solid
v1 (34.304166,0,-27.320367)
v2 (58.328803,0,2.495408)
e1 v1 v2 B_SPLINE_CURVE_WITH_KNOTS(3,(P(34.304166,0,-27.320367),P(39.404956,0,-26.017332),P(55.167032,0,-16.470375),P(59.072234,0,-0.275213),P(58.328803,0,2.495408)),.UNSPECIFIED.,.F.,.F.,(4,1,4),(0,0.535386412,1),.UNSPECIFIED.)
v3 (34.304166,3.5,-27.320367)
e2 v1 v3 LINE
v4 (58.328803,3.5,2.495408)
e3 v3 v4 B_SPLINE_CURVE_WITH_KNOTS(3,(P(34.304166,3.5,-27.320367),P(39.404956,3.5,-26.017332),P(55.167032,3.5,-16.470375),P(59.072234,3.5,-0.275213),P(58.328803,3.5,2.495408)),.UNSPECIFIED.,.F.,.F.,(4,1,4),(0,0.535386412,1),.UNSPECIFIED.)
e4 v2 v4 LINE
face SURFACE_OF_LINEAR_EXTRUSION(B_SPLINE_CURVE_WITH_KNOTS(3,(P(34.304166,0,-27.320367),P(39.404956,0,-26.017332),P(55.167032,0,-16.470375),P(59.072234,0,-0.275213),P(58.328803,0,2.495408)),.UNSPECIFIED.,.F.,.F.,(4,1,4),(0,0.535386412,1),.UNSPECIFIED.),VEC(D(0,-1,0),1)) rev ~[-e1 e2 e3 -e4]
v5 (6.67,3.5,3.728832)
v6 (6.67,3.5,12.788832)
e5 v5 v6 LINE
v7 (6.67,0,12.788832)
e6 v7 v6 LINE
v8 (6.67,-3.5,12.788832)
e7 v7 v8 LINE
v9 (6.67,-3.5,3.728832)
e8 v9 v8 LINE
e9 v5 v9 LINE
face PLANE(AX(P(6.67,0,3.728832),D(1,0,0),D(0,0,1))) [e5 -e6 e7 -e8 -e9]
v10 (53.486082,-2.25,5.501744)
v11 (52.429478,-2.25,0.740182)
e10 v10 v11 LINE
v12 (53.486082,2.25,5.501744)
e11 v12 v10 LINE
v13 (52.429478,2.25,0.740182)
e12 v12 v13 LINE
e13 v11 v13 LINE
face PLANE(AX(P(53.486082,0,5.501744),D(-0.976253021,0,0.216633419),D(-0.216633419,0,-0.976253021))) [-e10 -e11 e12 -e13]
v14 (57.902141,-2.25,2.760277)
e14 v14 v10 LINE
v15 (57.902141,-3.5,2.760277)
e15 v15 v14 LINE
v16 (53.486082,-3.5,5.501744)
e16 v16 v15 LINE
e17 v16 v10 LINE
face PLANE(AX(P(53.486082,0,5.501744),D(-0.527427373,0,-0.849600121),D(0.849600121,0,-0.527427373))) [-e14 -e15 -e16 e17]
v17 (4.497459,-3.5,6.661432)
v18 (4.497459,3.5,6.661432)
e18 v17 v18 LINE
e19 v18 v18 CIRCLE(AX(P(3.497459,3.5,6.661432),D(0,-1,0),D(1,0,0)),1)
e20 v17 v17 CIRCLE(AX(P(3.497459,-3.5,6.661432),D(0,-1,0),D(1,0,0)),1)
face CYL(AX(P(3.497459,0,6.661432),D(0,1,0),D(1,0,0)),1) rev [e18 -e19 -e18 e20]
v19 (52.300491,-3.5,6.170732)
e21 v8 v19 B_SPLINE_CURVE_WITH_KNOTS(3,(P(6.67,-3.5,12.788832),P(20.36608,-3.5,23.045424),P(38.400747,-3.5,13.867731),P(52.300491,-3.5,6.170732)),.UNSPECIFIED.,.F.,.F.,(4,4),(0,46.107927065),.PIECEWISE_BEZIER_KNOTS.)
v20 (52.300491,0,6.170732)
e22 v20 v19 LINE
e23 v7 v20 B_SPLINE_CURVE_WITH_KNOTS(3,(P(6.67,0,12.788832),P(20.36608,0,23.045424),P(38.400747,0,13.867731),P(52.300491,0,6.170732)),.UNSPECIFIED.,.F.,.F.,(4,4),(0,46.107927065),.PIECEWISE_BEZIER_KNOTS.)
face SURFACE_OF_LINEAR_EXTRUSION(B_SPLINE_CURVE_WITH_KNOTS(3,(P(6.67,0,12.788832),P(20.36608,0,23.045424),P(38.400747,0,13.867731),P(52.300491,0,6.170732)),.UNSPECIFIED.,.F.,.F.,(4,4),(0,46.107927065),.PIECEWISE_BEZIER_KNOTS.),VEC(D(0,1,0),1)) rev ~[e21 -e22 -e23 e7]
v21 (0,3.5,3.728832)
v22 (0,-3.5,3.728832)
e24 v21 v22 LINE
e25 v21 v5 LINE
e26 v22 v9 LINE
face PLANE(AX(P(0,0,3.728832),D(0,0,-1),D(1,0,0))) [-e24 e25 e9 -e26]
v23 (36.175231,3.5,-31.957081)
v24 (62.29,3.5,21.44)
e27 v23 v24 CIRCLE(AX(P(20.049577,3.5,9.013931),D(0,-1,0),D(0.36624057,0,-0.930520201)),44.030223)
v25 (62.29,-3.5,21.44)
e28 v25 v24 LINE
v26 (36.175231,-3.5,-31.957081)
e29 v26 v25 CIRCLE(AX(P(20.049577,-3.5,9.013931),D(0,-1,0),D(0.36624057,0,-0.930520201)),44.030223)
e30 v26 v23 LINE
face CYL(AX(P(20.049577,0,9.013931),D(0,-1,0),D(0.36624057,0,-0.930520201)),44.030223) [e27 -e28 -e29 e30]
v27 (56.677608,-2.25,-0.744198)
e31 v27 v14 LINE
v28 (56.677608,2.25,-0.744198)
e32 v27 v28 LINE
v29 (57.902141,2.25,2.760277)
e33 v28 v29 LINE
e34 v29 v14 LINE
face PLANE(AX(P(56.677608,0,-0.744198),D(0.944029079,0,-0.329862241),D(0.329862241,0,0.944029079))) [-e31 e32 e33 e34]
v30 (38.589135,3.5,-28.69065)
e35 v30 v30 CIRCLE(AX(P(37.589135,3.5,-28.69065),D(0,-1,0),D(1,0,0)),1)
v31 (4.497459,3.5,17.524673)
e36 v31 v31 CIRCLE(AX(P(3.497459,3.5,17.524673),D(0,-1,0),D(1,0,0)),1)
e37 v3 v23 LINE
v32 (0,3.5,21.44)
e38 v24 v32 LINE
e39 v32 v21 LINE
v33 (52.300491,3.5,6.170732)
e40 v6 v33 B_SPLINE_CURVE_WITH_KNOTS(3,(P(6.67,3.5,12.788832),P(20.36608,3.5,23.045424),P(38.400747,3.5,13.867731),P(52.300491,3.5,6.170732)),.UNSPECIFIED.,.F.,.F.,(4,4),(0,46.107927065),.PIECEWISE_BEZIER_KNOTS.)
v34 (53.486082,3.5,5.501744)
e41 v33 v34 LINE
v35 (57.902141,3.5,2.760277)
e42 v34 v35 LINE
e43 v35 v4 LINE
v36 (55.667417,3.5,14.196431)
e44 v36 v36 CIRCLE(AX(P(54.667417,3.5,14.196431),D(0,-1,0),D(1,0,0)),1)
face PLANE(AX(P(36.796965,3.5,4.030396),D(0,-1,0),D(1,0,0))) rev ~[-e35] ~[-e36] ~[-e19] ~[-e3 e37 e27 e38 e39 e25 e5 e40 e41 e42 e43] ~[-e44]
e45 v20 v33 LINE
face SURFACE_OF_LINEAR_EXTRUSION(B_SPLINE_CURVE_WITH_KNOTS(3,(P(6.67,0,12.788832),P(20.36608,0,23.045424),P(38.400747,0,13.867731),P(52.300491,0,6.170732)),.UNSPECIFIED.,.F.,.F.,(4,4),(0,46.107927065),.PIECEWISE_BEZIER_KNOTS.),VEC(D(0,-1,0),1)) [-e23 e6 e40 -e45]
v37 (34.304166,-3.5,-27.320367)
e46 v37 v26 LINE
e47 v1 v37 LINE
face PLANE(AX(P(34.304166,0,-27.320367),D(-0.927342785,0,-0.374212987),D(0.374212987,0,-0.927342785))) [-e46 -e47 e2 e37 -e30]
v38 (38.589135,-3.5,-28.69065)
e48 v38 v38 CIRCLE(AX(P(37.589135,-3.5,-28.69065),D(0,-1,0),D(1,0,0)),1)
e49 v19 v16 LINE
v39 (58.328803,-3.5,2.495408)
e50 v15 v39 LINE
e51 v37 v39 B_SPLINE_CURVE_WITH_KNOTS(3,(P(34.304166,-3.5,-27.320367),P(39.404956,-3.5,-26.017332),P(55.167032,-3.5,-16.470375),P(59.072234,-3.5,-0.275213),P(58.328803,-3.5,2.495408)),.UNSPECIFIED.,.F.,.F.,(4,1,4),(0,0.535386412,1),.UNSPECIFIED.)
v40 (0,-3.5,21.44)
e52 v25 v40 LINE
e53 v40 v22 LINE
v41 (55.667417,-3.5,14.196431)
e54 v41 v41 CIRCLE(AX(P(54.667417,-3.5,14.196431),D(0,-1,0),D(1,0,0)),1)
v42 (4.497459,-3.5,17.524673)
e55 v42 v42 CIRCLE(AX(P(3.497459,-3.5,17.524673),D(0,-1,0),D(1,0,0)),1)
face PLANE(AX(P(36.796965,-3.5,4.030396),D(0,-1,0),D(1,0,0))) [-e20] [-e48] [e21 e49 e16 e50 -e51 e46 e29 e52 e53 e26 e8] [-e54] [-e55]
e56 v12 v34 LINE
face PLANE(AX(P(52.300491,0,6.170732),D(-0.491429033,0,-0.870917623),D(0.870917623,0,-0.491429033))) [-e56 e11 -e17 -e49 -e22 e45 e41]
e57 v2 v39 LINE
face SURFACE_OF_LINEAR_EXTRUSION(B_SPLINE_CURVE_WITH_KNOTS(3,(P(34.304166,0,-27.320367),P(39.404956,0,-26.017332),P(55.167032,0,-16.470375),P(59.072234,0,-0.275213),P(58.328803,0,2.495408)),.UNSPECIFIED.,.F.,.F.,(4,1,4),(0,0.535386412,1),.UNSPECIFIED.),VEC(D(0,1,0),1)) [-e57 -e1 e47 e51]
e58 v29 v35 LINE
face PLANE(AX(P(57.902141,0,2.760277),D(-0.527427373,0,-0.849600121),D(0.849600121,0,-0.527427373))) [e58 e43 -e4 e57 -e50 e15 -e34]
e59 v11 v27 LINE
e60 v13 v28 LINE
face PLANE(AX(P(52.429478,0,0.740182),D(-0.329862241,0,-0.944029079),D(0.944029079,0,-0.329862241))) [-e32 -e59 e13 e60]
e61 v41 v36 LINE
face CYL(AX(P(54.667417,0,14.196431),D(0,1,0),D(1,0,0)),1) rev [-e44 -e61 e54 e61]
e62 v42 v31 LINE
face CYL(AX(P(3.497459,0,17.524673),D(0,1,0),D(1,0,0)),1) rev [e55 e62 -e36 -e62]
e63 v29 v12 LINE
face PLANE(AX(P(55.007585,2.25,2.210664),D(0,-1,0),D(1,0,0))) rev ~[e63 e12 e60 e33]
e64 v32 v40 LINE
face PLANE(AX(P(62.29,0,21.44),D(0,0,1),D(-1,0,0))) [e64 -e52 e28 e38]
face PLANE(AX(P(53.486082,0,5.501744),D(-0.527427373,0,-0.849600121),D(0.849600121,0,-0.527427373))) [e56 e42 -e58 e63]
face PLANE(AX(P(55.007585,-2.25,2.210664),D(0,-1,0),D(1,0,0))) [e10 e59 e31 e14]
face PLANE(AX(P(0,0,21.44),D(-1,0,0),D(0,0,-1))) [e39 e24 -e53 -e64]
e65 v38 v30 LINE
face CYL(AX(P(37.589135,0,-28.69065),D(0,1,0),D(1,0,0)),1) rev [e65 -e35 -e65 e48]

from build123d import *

# Parameters (mm, degrees)
F0_R     = 1
F1_DEPTH = 3.5
F2_DEPTH = 2.25


# Not quite as in the source:
# - a feature names something its author has since deleted; it is built from what else it names


with BuildPart() as f1:
    # F0 (on Front) → F1 (new body, symmetric)
    with BuildSketch(Plane.XZ):
        with BuildLine():
            Line((62.29, 21.44), (0, 21.44))
            Line((0, 21.44), (0, 3.7288318854))
            Line((0, 3.7288318854), (6.67, 3.7288318854))
            Line((6.67, 3.7288318854), (6.67, 12.7888318854))
            add(Edge.make_bspline(
                [(6.67, 12.7888318854), (20.3660801053, 23.045424372), (38.400747317, 13.8677307047), (52.300490874, 6.170732399)],
                knots=[0, 0, 0, 0, 46.1079270648, 46.1079270648, 46.1079270648, 46.1079270648], degree=3))
            Line((52.300490874, 6.170732399), (53.4860821652, 5.5017437759))
            Line((53.4860821652, 5.5017437759), (57.9021407774, 2.7602773683))
            Line((57.9021407774, 2.7602773683), (58.3288028571, 2.49540775))
            add(Edge.make_bspline(
                [(34.304166128, -27.3203667793), (39.4049563141, -26.0173317216), (55.1670315062, -16.4703750294), (59.0722335282, -0.2752133185), (58.3288028571, 2.49540775)],
                knots=[0, 0, 0, 0, 0.5353864124, 1, 1, 1, 1], degree=3))
            Line((34.304166128, -27.3203667793), (36.1752310606, -31.9570807038))
            ThreePointArc((36.1752310606, -31.9570807038), (59.6028549739, -10.3302859108), (62.29, 21.44))
        make_face()
        with Locations((37.5891347185, -28.6906498222)):
            Circle(F0_R, mode=Mode.SUBTRACT)
        with Locations((3.4974589944, 6.6614318639)):
            Circle(F0_R, mode=Mode.SUBTRACT)
        with Locations((3.4974589944, 17.5246726722)):
            Circle(F0_R, mode=Mode.SUBTRACT)
        with Locations((54.66741696, 14.1964312643)):
            Circle(F0_R, mode=Mode.SUBTRACT)
    extrude(amount=F1_DEPTH, both=True)

    # F0 (on Front) → F2 (join, symmetric)
    with BuildSketch(Plane.XZ):
        Polygon((56.6776084413, -0.7441981102), (57.9021407774, 2.7602773683), (53.4860821652, 5.5017437759), (52.4294775853, 0.7401819728), align=None)
    extrude(amount=F2_DEPTH, both=True)


solid = f1.part
